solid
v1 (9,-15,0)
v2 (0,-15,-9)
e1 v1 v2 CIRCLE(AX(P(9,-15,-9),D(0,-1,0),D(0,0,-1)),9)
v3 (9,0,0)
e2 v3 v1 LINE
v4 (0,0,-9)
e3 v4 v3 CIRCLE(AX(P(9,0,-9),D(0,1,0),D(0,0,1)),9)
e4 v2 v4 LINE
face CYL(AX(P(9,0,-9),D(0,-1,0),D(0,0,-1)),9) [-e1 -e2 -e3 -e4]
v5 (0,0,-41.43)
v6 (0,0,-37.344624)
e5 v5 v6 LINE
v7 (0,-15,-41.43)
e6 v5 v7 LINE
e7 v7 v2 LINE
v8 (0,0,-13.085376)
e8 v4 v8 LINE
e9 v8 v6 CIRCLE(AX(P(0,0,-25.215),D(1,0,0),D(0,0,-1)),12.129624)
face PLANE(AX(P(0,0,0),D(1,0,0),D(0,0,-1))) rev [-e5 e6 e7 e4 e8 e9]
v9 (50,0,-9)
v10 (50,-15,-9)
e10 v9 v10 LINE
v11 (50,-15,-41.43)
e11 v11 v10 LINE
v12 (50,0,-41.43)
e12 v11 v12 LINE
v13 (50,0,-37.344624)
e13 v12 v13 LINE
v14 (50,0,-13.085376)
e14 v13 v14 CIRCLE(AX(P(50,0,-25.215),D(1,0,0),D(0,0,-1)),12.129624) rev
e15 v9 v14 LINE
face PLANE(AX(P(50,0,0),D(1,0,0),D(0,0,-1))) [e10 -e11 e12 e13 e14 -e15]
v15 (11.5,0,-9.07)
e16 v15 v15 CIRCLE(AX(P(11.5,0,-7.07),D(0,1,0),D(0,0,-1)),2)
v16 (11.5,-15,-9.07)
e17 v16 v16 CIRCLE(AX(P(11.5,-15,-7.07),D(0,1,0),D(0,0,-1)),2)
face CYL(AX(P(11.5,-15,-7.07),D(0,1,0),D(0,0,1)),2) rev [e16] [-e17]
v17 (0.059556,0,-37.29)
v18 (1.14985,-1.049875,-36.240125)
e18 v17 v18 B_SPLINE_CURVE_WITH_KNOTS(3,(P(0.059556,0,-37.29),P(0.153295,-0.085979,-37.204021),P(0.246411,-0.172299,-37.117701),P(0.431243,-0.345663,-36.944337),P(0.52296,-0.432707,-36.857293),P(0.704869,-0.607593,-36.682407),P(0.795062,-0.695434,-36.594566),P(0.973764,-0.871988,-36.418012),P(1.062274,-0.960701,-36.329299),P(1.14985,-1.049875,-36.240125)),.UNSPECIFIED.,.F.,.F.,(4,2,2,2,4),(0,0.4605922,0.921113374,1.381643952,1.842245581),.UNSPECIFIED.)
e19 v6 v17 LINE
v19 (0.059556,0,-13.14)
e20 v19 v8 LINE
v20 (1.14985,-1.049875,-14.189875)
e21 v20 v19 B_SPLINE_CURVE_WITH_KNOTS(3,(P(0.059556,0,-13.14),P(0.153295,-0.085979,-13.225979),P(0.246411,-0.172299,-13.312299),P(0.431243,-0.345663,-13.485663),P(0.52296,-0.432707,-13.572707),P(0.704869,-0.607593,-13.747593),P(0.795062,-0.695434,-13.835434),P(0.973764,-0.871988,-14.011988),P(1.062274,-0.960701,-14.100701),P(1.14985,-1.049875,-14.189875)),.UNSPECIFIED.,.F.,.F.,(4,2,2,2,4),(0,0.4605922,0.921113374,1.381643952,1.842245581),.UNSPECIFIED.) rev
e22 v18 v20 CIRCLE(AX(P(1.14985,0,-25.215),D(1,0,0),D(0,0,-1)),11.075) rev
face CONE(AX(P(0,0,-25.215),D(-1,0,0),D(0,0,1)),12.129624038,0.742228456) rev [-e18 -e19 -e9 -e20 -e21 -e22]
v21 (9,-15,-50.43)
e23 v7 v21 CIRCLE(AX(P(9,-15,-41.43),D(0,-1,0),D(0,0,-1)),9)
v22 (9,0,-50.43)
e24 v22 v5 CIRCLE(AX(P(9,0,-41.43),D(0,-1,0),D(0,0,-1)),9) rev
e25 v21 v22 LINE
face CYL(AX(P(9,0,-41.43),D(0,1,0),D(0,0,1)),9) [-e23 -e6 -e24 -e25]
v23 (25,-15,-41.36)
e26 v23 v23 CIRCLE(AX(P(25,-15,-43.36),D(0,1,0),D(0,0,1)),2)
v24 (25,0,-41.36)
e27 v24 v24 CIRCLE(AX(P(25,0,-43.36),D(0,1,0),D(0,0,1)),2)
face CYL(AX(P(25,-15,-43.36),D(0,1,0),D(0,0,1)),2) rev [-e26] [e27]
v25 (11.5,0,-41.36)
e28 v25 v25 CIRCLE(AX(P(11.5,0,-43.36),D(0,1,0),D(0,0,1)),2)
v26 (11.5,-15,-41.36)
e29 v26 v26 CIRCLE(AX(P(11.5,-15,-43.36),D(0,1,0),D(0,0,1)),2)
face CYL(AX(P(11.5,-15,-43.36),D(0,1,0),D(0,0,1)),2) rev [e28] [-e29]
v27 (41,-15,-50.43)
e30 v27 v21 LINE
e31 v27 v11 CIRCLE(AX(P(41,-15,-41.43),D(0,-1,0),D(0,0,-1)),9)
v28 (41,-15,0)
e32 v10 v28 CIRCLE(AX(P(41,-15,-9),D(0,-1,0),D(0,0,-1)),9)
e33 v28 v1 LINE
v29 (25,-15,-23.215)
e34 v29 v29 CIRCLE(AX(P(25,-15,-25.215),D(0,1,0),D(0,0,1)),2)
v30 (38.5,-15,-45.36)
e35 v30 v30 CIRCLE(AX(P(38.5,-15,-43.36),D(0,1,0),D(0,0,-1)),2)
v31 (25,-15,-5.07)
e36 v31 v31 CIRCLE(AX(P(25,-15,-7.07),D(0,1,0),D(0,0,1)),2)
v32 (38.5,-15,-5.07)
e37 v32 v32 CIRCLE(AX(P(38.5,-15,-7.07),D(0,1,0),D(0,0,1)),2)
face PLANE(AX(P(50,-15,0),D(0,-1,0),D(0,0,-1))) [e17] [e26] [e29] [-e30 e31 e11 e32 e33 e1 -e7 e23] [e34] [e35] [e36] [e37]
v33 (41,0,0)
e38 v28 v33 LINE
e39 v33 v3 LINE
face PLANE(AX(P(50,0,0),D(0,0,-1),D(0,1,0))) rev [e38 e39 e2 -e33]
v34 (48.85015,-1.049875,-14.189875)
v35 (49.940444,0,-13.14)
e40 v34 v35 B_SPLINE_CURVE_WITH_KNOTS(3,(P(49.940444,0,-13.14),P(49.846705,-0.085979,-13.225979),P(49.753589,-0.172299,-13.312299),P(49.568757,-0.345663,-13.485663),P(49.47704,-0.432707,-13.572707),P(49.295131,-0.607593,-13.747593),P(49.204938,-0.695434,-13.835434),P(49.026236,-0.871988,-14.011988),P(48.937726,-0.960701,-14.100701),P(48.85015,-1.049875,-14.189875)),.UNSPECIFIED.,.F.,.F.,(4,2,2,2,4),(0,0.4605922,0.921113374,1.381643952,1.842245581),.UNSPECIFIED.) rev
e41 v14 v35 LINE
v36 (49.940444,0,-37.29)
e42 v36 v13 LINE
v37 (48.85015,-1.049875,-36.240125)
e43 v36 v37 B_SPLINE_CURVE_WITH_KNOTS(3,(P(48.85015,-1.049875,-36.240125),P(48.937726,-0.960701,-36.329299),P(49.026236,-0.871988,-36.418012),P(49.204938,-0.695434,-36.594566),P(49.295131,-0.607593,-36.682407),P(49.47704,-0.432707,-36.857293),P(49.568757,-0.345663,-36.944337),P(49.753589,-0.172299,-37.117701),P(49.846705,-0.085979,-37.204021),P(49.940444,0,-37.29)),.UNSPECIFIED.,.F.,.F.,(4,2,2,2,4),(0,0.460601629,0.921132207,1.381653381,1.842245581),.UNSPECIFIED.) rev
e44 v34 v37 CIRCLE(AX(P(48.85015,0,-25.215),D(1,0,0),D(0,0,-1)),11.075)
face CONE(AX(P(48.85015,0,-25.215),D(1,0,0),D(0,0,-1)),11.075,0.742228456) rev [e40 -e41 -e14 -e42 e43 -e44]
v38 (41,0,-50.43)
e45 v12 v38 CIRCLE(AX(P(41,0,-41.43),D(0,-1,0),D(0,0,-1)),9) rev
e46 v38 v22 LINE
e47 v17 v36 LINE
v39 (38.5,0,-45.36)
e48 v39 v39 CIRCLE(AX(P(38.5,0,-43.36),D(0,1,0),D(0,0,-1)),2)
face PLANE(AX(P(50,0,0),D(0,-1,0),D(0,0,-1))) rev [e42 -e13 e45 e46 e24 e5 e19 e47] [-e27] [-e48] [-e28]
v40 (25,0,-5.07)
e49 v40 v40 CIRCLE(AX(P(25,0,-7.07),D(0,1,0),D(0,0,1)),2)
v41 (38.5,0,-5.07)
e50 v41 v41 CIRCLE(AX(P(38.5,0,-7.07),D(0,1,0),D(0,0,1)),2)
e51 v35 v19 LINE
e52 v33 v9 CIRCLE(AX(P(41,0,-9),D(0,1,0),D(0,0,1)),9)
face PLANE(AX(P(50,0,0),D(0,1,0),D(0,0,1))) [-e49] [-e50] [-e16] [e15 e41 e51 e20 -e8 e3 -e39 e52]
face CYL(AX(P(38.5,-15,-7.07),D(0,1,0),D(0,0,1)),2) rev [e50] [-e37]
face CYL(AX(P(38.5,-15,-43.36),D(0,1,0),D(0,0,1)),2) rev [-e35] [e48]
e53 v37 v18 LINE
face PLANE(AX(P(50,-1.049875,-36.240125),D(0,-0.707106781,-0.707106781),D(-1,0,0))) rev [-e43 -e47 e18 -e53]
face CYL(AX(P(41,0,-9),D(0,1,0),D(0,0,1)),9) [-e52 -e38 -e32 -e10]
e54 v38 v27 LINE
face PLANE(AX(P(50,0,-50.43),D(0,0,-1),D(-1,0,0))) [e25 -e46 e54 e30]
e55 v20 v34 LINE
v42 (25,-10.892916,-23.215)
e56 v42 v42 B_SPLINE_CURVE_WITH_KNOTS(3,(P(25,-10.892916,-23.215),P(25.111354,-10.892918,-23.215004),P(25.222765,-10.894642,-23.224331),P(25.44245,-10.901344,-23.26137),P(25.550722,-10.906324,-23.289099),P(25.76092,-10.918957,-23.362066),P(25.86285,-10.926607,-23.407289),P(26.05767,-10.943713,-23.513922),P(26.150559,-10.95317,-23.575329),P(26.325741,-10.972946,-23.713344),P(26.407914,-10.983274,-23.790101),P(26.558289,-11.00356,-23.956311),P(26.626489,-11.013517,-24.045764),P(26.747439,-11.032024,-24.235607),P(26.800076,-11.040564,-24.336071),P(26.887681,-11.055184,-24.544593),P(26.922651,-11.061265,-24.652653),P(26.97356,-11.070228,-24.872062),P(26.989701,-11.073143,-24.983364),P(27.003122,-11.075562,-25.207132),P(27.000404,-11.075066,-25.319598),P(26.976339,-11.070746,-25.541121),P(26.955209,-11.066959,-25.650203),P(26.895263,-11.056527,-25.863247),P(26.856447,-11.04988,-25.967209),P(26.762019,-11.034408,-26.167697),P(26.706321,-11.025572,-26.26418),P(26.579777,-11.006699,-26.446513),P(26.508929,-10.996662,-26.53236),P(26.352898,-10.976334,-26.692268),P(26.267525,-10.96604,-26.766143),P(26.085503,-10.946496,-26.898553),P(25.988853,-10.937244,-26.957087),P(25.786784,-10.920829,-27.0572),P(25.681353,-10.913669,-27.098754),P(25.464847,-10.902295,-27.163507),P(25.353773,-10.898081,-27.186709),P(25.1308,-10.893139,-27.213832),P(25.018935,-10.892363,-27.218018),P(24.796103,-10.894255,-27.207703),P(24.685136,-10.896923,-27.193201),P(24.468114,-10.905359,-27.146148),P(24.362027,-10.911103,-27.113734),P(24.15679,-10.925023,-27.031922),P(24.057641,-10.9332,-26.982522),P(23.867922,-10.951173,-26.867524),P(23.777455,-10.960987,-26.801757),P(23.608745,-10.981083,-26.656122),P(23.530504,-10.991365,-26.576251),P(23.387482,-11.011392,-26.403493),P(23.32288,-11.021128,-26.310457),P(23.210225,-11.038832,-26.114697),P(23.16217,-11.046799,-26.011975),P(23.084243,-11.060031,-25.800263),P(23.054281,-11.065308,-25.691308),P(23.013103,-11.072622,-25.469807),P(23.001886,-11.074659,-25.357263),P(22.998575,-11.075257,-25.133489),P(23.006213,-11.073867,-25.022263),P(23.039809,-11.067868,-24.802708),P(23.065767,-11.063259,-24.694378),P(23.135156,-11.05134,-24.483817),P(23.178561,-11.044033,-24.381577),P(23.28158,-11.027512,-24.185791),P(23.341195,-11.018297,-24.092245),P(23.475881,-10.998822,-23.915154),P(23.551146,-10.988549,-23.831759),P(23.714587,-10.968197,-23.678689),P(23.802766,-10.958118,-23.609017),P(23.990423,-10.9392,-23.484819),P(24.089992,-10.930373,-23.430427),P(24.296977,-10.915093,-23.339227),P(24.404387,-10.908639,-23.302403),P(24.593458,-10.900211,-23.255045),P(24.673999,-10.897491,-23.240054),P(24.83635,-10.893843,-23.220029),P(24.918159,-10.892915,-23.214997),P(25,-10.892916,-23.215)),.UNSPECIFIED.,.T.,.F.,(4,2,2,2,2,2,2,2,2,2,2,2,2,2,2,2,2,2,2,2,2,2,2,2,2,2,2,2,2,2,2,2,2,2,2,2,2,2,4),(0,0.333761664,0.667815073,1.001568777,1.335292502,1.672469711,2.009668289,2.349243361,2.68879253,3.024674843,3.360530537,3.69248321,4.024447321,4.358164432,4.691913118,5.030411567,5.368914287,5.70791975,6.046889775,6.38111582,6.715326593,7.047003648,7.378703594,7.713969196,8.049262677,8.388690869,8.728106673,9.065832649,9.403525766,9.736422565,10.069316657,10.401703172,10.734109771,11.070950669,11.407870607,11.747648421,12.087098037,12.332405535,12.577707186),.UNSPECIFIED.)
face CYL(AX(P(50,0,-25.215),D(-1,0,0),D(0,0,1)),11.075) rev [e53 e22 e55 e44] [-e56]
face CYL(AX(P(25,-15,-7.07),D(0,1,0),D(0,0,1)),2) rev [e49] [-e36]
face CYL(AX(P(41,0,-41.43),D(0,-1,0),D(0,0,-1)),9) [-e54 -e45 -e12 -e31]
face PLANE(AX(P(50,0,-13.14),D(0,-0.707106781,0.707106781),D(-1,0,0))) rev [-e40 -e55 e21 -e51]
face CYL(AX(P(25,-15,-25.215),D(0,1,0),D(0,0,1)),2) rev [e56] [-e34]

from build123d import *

# Parameters (mm, degrees)
BOSS_EXTRUDE1_DEPTH = 50
SKETCH2_R           = 2
CUT_EXTRUDE1_DEPTH  = 73.582262985
CHAMFER2_START      = -1
CHAMFER2_2_DEPTH    = 52
FILLET3_R           = 9


with BuildPart() as part:
    # Sketch1 → Boss-Extrude1 (new body)
    with BuildSketch(Plane(origin=(0, 0, 0), x_dir=(0, 0, -1), z_dir=(1, 0, 0))):
        with BuildLine():
            Line((14.14, 0), (0, 0))
            Line((0, 0), (0, -15))
            Line((0, -15), (50.43, -15))
            Line((50.43, -15), (50.43, 0))
            Line((50.43, 0), (36.29, 0))
            ThreePointArc((36.29, 0), (25.215, -11.075), (14.14, 0))
        make_face()
    extrude(amount=BOSS_EXTRUDE1_DEPTH)

    # Sketch2 → Cut-Extrude1 (cut, through all)
    with BuildSketch(Plane(origin=(0, 0, 0), x_dir=(1, 0, 0), z_dir=(0, 1, 0))):
        with Locations(Location((11.5, 43.36, 0), (0, 0, 270))):
            Circle(SKETCH2_R)
        with Locations(Location((38.5, 43.36, 0), (0, 0, 90))):
            Circle(SKETCH2_R)
        with Locations(Location((38.5, 7.07, 0), (0, 0, 270))):
            Circle(SKETCH2_R)
        with Locations(Location((11.5, 7.07, 0), (0, 0, 90))):
            Circle(SKETCH2_R)
        with Locations(Location((25, 25.215, 0), (0, 0, 270))):
            Circle(SKETCH2_R)
        with Locations(Location((25, 43.36, 0), (0, 0, 270))):
            Circle(SKETCH2_R)
        with Locations(Location((25, 7.07, 0), (0, 0, 270))):
            Circle(SKETCH2_R)
    extrude(amount=-CUT_EXTRUDE1_DEPTH, mode=Mode.SUBTRACT)

    # Chamfer2: read off the stored shape, not the designer's step
    # Chamfer2 outline → Chamfer2 (revolve, cut)
    with BuildSketch(Plane.YX.offset(25.215)):
        Polygon((12.129624038, 0), (11.075, 1.149849684), (11.075, 0), align=None)
        Polygon((11.075, 50), (11.075, 48.850150316), (12.129624038, 50), align=None)
    revolve(axis=Axis((0, 0, -25.215), (1, 0, 0)), mode=Mode.SUBTRACT)

    # Chamfer2 2 outline → Chamfer2 2 (cut)
    with BuildSketch(Plane.YZ.offset(CHAMFER2_START)):
        with BuildLine():
            Line((0, -14.14), (0, -13.14))
            Line((0, -13.14), (-1.049874688, -14.189874688))
            ThreePointArc((-1.049874688, -14.189874688), (-0.525529339, -14.152475699), (0, -14.14))
        make_face()
        with BuildLine():
            ThreePointArc((0, -36.29), (-0.525529339, -36.277524301), (-1.049874688, -36.240125312))
            Line((-1.049874688, -36.240125312), (0, -37.29))
            Line((0, -37.29), (0, -36.29))
        make_face()
    extrude(amount=CHAMFER2_2_DEPTH, mode=Mode.SUBTRACT)

    # Fillet3
    fillet3_edges = [part.edges().sort_by_distance(p)[0] for p in [
        (50, -7.5, 0),
        (50, -7.5, -50.43),
        (0, -7.5, -50.43),
        (0, -7.5, 0),
    ]]
    fillet(fillet3_edges, radius=FILLET3_R)


solid = part.part
